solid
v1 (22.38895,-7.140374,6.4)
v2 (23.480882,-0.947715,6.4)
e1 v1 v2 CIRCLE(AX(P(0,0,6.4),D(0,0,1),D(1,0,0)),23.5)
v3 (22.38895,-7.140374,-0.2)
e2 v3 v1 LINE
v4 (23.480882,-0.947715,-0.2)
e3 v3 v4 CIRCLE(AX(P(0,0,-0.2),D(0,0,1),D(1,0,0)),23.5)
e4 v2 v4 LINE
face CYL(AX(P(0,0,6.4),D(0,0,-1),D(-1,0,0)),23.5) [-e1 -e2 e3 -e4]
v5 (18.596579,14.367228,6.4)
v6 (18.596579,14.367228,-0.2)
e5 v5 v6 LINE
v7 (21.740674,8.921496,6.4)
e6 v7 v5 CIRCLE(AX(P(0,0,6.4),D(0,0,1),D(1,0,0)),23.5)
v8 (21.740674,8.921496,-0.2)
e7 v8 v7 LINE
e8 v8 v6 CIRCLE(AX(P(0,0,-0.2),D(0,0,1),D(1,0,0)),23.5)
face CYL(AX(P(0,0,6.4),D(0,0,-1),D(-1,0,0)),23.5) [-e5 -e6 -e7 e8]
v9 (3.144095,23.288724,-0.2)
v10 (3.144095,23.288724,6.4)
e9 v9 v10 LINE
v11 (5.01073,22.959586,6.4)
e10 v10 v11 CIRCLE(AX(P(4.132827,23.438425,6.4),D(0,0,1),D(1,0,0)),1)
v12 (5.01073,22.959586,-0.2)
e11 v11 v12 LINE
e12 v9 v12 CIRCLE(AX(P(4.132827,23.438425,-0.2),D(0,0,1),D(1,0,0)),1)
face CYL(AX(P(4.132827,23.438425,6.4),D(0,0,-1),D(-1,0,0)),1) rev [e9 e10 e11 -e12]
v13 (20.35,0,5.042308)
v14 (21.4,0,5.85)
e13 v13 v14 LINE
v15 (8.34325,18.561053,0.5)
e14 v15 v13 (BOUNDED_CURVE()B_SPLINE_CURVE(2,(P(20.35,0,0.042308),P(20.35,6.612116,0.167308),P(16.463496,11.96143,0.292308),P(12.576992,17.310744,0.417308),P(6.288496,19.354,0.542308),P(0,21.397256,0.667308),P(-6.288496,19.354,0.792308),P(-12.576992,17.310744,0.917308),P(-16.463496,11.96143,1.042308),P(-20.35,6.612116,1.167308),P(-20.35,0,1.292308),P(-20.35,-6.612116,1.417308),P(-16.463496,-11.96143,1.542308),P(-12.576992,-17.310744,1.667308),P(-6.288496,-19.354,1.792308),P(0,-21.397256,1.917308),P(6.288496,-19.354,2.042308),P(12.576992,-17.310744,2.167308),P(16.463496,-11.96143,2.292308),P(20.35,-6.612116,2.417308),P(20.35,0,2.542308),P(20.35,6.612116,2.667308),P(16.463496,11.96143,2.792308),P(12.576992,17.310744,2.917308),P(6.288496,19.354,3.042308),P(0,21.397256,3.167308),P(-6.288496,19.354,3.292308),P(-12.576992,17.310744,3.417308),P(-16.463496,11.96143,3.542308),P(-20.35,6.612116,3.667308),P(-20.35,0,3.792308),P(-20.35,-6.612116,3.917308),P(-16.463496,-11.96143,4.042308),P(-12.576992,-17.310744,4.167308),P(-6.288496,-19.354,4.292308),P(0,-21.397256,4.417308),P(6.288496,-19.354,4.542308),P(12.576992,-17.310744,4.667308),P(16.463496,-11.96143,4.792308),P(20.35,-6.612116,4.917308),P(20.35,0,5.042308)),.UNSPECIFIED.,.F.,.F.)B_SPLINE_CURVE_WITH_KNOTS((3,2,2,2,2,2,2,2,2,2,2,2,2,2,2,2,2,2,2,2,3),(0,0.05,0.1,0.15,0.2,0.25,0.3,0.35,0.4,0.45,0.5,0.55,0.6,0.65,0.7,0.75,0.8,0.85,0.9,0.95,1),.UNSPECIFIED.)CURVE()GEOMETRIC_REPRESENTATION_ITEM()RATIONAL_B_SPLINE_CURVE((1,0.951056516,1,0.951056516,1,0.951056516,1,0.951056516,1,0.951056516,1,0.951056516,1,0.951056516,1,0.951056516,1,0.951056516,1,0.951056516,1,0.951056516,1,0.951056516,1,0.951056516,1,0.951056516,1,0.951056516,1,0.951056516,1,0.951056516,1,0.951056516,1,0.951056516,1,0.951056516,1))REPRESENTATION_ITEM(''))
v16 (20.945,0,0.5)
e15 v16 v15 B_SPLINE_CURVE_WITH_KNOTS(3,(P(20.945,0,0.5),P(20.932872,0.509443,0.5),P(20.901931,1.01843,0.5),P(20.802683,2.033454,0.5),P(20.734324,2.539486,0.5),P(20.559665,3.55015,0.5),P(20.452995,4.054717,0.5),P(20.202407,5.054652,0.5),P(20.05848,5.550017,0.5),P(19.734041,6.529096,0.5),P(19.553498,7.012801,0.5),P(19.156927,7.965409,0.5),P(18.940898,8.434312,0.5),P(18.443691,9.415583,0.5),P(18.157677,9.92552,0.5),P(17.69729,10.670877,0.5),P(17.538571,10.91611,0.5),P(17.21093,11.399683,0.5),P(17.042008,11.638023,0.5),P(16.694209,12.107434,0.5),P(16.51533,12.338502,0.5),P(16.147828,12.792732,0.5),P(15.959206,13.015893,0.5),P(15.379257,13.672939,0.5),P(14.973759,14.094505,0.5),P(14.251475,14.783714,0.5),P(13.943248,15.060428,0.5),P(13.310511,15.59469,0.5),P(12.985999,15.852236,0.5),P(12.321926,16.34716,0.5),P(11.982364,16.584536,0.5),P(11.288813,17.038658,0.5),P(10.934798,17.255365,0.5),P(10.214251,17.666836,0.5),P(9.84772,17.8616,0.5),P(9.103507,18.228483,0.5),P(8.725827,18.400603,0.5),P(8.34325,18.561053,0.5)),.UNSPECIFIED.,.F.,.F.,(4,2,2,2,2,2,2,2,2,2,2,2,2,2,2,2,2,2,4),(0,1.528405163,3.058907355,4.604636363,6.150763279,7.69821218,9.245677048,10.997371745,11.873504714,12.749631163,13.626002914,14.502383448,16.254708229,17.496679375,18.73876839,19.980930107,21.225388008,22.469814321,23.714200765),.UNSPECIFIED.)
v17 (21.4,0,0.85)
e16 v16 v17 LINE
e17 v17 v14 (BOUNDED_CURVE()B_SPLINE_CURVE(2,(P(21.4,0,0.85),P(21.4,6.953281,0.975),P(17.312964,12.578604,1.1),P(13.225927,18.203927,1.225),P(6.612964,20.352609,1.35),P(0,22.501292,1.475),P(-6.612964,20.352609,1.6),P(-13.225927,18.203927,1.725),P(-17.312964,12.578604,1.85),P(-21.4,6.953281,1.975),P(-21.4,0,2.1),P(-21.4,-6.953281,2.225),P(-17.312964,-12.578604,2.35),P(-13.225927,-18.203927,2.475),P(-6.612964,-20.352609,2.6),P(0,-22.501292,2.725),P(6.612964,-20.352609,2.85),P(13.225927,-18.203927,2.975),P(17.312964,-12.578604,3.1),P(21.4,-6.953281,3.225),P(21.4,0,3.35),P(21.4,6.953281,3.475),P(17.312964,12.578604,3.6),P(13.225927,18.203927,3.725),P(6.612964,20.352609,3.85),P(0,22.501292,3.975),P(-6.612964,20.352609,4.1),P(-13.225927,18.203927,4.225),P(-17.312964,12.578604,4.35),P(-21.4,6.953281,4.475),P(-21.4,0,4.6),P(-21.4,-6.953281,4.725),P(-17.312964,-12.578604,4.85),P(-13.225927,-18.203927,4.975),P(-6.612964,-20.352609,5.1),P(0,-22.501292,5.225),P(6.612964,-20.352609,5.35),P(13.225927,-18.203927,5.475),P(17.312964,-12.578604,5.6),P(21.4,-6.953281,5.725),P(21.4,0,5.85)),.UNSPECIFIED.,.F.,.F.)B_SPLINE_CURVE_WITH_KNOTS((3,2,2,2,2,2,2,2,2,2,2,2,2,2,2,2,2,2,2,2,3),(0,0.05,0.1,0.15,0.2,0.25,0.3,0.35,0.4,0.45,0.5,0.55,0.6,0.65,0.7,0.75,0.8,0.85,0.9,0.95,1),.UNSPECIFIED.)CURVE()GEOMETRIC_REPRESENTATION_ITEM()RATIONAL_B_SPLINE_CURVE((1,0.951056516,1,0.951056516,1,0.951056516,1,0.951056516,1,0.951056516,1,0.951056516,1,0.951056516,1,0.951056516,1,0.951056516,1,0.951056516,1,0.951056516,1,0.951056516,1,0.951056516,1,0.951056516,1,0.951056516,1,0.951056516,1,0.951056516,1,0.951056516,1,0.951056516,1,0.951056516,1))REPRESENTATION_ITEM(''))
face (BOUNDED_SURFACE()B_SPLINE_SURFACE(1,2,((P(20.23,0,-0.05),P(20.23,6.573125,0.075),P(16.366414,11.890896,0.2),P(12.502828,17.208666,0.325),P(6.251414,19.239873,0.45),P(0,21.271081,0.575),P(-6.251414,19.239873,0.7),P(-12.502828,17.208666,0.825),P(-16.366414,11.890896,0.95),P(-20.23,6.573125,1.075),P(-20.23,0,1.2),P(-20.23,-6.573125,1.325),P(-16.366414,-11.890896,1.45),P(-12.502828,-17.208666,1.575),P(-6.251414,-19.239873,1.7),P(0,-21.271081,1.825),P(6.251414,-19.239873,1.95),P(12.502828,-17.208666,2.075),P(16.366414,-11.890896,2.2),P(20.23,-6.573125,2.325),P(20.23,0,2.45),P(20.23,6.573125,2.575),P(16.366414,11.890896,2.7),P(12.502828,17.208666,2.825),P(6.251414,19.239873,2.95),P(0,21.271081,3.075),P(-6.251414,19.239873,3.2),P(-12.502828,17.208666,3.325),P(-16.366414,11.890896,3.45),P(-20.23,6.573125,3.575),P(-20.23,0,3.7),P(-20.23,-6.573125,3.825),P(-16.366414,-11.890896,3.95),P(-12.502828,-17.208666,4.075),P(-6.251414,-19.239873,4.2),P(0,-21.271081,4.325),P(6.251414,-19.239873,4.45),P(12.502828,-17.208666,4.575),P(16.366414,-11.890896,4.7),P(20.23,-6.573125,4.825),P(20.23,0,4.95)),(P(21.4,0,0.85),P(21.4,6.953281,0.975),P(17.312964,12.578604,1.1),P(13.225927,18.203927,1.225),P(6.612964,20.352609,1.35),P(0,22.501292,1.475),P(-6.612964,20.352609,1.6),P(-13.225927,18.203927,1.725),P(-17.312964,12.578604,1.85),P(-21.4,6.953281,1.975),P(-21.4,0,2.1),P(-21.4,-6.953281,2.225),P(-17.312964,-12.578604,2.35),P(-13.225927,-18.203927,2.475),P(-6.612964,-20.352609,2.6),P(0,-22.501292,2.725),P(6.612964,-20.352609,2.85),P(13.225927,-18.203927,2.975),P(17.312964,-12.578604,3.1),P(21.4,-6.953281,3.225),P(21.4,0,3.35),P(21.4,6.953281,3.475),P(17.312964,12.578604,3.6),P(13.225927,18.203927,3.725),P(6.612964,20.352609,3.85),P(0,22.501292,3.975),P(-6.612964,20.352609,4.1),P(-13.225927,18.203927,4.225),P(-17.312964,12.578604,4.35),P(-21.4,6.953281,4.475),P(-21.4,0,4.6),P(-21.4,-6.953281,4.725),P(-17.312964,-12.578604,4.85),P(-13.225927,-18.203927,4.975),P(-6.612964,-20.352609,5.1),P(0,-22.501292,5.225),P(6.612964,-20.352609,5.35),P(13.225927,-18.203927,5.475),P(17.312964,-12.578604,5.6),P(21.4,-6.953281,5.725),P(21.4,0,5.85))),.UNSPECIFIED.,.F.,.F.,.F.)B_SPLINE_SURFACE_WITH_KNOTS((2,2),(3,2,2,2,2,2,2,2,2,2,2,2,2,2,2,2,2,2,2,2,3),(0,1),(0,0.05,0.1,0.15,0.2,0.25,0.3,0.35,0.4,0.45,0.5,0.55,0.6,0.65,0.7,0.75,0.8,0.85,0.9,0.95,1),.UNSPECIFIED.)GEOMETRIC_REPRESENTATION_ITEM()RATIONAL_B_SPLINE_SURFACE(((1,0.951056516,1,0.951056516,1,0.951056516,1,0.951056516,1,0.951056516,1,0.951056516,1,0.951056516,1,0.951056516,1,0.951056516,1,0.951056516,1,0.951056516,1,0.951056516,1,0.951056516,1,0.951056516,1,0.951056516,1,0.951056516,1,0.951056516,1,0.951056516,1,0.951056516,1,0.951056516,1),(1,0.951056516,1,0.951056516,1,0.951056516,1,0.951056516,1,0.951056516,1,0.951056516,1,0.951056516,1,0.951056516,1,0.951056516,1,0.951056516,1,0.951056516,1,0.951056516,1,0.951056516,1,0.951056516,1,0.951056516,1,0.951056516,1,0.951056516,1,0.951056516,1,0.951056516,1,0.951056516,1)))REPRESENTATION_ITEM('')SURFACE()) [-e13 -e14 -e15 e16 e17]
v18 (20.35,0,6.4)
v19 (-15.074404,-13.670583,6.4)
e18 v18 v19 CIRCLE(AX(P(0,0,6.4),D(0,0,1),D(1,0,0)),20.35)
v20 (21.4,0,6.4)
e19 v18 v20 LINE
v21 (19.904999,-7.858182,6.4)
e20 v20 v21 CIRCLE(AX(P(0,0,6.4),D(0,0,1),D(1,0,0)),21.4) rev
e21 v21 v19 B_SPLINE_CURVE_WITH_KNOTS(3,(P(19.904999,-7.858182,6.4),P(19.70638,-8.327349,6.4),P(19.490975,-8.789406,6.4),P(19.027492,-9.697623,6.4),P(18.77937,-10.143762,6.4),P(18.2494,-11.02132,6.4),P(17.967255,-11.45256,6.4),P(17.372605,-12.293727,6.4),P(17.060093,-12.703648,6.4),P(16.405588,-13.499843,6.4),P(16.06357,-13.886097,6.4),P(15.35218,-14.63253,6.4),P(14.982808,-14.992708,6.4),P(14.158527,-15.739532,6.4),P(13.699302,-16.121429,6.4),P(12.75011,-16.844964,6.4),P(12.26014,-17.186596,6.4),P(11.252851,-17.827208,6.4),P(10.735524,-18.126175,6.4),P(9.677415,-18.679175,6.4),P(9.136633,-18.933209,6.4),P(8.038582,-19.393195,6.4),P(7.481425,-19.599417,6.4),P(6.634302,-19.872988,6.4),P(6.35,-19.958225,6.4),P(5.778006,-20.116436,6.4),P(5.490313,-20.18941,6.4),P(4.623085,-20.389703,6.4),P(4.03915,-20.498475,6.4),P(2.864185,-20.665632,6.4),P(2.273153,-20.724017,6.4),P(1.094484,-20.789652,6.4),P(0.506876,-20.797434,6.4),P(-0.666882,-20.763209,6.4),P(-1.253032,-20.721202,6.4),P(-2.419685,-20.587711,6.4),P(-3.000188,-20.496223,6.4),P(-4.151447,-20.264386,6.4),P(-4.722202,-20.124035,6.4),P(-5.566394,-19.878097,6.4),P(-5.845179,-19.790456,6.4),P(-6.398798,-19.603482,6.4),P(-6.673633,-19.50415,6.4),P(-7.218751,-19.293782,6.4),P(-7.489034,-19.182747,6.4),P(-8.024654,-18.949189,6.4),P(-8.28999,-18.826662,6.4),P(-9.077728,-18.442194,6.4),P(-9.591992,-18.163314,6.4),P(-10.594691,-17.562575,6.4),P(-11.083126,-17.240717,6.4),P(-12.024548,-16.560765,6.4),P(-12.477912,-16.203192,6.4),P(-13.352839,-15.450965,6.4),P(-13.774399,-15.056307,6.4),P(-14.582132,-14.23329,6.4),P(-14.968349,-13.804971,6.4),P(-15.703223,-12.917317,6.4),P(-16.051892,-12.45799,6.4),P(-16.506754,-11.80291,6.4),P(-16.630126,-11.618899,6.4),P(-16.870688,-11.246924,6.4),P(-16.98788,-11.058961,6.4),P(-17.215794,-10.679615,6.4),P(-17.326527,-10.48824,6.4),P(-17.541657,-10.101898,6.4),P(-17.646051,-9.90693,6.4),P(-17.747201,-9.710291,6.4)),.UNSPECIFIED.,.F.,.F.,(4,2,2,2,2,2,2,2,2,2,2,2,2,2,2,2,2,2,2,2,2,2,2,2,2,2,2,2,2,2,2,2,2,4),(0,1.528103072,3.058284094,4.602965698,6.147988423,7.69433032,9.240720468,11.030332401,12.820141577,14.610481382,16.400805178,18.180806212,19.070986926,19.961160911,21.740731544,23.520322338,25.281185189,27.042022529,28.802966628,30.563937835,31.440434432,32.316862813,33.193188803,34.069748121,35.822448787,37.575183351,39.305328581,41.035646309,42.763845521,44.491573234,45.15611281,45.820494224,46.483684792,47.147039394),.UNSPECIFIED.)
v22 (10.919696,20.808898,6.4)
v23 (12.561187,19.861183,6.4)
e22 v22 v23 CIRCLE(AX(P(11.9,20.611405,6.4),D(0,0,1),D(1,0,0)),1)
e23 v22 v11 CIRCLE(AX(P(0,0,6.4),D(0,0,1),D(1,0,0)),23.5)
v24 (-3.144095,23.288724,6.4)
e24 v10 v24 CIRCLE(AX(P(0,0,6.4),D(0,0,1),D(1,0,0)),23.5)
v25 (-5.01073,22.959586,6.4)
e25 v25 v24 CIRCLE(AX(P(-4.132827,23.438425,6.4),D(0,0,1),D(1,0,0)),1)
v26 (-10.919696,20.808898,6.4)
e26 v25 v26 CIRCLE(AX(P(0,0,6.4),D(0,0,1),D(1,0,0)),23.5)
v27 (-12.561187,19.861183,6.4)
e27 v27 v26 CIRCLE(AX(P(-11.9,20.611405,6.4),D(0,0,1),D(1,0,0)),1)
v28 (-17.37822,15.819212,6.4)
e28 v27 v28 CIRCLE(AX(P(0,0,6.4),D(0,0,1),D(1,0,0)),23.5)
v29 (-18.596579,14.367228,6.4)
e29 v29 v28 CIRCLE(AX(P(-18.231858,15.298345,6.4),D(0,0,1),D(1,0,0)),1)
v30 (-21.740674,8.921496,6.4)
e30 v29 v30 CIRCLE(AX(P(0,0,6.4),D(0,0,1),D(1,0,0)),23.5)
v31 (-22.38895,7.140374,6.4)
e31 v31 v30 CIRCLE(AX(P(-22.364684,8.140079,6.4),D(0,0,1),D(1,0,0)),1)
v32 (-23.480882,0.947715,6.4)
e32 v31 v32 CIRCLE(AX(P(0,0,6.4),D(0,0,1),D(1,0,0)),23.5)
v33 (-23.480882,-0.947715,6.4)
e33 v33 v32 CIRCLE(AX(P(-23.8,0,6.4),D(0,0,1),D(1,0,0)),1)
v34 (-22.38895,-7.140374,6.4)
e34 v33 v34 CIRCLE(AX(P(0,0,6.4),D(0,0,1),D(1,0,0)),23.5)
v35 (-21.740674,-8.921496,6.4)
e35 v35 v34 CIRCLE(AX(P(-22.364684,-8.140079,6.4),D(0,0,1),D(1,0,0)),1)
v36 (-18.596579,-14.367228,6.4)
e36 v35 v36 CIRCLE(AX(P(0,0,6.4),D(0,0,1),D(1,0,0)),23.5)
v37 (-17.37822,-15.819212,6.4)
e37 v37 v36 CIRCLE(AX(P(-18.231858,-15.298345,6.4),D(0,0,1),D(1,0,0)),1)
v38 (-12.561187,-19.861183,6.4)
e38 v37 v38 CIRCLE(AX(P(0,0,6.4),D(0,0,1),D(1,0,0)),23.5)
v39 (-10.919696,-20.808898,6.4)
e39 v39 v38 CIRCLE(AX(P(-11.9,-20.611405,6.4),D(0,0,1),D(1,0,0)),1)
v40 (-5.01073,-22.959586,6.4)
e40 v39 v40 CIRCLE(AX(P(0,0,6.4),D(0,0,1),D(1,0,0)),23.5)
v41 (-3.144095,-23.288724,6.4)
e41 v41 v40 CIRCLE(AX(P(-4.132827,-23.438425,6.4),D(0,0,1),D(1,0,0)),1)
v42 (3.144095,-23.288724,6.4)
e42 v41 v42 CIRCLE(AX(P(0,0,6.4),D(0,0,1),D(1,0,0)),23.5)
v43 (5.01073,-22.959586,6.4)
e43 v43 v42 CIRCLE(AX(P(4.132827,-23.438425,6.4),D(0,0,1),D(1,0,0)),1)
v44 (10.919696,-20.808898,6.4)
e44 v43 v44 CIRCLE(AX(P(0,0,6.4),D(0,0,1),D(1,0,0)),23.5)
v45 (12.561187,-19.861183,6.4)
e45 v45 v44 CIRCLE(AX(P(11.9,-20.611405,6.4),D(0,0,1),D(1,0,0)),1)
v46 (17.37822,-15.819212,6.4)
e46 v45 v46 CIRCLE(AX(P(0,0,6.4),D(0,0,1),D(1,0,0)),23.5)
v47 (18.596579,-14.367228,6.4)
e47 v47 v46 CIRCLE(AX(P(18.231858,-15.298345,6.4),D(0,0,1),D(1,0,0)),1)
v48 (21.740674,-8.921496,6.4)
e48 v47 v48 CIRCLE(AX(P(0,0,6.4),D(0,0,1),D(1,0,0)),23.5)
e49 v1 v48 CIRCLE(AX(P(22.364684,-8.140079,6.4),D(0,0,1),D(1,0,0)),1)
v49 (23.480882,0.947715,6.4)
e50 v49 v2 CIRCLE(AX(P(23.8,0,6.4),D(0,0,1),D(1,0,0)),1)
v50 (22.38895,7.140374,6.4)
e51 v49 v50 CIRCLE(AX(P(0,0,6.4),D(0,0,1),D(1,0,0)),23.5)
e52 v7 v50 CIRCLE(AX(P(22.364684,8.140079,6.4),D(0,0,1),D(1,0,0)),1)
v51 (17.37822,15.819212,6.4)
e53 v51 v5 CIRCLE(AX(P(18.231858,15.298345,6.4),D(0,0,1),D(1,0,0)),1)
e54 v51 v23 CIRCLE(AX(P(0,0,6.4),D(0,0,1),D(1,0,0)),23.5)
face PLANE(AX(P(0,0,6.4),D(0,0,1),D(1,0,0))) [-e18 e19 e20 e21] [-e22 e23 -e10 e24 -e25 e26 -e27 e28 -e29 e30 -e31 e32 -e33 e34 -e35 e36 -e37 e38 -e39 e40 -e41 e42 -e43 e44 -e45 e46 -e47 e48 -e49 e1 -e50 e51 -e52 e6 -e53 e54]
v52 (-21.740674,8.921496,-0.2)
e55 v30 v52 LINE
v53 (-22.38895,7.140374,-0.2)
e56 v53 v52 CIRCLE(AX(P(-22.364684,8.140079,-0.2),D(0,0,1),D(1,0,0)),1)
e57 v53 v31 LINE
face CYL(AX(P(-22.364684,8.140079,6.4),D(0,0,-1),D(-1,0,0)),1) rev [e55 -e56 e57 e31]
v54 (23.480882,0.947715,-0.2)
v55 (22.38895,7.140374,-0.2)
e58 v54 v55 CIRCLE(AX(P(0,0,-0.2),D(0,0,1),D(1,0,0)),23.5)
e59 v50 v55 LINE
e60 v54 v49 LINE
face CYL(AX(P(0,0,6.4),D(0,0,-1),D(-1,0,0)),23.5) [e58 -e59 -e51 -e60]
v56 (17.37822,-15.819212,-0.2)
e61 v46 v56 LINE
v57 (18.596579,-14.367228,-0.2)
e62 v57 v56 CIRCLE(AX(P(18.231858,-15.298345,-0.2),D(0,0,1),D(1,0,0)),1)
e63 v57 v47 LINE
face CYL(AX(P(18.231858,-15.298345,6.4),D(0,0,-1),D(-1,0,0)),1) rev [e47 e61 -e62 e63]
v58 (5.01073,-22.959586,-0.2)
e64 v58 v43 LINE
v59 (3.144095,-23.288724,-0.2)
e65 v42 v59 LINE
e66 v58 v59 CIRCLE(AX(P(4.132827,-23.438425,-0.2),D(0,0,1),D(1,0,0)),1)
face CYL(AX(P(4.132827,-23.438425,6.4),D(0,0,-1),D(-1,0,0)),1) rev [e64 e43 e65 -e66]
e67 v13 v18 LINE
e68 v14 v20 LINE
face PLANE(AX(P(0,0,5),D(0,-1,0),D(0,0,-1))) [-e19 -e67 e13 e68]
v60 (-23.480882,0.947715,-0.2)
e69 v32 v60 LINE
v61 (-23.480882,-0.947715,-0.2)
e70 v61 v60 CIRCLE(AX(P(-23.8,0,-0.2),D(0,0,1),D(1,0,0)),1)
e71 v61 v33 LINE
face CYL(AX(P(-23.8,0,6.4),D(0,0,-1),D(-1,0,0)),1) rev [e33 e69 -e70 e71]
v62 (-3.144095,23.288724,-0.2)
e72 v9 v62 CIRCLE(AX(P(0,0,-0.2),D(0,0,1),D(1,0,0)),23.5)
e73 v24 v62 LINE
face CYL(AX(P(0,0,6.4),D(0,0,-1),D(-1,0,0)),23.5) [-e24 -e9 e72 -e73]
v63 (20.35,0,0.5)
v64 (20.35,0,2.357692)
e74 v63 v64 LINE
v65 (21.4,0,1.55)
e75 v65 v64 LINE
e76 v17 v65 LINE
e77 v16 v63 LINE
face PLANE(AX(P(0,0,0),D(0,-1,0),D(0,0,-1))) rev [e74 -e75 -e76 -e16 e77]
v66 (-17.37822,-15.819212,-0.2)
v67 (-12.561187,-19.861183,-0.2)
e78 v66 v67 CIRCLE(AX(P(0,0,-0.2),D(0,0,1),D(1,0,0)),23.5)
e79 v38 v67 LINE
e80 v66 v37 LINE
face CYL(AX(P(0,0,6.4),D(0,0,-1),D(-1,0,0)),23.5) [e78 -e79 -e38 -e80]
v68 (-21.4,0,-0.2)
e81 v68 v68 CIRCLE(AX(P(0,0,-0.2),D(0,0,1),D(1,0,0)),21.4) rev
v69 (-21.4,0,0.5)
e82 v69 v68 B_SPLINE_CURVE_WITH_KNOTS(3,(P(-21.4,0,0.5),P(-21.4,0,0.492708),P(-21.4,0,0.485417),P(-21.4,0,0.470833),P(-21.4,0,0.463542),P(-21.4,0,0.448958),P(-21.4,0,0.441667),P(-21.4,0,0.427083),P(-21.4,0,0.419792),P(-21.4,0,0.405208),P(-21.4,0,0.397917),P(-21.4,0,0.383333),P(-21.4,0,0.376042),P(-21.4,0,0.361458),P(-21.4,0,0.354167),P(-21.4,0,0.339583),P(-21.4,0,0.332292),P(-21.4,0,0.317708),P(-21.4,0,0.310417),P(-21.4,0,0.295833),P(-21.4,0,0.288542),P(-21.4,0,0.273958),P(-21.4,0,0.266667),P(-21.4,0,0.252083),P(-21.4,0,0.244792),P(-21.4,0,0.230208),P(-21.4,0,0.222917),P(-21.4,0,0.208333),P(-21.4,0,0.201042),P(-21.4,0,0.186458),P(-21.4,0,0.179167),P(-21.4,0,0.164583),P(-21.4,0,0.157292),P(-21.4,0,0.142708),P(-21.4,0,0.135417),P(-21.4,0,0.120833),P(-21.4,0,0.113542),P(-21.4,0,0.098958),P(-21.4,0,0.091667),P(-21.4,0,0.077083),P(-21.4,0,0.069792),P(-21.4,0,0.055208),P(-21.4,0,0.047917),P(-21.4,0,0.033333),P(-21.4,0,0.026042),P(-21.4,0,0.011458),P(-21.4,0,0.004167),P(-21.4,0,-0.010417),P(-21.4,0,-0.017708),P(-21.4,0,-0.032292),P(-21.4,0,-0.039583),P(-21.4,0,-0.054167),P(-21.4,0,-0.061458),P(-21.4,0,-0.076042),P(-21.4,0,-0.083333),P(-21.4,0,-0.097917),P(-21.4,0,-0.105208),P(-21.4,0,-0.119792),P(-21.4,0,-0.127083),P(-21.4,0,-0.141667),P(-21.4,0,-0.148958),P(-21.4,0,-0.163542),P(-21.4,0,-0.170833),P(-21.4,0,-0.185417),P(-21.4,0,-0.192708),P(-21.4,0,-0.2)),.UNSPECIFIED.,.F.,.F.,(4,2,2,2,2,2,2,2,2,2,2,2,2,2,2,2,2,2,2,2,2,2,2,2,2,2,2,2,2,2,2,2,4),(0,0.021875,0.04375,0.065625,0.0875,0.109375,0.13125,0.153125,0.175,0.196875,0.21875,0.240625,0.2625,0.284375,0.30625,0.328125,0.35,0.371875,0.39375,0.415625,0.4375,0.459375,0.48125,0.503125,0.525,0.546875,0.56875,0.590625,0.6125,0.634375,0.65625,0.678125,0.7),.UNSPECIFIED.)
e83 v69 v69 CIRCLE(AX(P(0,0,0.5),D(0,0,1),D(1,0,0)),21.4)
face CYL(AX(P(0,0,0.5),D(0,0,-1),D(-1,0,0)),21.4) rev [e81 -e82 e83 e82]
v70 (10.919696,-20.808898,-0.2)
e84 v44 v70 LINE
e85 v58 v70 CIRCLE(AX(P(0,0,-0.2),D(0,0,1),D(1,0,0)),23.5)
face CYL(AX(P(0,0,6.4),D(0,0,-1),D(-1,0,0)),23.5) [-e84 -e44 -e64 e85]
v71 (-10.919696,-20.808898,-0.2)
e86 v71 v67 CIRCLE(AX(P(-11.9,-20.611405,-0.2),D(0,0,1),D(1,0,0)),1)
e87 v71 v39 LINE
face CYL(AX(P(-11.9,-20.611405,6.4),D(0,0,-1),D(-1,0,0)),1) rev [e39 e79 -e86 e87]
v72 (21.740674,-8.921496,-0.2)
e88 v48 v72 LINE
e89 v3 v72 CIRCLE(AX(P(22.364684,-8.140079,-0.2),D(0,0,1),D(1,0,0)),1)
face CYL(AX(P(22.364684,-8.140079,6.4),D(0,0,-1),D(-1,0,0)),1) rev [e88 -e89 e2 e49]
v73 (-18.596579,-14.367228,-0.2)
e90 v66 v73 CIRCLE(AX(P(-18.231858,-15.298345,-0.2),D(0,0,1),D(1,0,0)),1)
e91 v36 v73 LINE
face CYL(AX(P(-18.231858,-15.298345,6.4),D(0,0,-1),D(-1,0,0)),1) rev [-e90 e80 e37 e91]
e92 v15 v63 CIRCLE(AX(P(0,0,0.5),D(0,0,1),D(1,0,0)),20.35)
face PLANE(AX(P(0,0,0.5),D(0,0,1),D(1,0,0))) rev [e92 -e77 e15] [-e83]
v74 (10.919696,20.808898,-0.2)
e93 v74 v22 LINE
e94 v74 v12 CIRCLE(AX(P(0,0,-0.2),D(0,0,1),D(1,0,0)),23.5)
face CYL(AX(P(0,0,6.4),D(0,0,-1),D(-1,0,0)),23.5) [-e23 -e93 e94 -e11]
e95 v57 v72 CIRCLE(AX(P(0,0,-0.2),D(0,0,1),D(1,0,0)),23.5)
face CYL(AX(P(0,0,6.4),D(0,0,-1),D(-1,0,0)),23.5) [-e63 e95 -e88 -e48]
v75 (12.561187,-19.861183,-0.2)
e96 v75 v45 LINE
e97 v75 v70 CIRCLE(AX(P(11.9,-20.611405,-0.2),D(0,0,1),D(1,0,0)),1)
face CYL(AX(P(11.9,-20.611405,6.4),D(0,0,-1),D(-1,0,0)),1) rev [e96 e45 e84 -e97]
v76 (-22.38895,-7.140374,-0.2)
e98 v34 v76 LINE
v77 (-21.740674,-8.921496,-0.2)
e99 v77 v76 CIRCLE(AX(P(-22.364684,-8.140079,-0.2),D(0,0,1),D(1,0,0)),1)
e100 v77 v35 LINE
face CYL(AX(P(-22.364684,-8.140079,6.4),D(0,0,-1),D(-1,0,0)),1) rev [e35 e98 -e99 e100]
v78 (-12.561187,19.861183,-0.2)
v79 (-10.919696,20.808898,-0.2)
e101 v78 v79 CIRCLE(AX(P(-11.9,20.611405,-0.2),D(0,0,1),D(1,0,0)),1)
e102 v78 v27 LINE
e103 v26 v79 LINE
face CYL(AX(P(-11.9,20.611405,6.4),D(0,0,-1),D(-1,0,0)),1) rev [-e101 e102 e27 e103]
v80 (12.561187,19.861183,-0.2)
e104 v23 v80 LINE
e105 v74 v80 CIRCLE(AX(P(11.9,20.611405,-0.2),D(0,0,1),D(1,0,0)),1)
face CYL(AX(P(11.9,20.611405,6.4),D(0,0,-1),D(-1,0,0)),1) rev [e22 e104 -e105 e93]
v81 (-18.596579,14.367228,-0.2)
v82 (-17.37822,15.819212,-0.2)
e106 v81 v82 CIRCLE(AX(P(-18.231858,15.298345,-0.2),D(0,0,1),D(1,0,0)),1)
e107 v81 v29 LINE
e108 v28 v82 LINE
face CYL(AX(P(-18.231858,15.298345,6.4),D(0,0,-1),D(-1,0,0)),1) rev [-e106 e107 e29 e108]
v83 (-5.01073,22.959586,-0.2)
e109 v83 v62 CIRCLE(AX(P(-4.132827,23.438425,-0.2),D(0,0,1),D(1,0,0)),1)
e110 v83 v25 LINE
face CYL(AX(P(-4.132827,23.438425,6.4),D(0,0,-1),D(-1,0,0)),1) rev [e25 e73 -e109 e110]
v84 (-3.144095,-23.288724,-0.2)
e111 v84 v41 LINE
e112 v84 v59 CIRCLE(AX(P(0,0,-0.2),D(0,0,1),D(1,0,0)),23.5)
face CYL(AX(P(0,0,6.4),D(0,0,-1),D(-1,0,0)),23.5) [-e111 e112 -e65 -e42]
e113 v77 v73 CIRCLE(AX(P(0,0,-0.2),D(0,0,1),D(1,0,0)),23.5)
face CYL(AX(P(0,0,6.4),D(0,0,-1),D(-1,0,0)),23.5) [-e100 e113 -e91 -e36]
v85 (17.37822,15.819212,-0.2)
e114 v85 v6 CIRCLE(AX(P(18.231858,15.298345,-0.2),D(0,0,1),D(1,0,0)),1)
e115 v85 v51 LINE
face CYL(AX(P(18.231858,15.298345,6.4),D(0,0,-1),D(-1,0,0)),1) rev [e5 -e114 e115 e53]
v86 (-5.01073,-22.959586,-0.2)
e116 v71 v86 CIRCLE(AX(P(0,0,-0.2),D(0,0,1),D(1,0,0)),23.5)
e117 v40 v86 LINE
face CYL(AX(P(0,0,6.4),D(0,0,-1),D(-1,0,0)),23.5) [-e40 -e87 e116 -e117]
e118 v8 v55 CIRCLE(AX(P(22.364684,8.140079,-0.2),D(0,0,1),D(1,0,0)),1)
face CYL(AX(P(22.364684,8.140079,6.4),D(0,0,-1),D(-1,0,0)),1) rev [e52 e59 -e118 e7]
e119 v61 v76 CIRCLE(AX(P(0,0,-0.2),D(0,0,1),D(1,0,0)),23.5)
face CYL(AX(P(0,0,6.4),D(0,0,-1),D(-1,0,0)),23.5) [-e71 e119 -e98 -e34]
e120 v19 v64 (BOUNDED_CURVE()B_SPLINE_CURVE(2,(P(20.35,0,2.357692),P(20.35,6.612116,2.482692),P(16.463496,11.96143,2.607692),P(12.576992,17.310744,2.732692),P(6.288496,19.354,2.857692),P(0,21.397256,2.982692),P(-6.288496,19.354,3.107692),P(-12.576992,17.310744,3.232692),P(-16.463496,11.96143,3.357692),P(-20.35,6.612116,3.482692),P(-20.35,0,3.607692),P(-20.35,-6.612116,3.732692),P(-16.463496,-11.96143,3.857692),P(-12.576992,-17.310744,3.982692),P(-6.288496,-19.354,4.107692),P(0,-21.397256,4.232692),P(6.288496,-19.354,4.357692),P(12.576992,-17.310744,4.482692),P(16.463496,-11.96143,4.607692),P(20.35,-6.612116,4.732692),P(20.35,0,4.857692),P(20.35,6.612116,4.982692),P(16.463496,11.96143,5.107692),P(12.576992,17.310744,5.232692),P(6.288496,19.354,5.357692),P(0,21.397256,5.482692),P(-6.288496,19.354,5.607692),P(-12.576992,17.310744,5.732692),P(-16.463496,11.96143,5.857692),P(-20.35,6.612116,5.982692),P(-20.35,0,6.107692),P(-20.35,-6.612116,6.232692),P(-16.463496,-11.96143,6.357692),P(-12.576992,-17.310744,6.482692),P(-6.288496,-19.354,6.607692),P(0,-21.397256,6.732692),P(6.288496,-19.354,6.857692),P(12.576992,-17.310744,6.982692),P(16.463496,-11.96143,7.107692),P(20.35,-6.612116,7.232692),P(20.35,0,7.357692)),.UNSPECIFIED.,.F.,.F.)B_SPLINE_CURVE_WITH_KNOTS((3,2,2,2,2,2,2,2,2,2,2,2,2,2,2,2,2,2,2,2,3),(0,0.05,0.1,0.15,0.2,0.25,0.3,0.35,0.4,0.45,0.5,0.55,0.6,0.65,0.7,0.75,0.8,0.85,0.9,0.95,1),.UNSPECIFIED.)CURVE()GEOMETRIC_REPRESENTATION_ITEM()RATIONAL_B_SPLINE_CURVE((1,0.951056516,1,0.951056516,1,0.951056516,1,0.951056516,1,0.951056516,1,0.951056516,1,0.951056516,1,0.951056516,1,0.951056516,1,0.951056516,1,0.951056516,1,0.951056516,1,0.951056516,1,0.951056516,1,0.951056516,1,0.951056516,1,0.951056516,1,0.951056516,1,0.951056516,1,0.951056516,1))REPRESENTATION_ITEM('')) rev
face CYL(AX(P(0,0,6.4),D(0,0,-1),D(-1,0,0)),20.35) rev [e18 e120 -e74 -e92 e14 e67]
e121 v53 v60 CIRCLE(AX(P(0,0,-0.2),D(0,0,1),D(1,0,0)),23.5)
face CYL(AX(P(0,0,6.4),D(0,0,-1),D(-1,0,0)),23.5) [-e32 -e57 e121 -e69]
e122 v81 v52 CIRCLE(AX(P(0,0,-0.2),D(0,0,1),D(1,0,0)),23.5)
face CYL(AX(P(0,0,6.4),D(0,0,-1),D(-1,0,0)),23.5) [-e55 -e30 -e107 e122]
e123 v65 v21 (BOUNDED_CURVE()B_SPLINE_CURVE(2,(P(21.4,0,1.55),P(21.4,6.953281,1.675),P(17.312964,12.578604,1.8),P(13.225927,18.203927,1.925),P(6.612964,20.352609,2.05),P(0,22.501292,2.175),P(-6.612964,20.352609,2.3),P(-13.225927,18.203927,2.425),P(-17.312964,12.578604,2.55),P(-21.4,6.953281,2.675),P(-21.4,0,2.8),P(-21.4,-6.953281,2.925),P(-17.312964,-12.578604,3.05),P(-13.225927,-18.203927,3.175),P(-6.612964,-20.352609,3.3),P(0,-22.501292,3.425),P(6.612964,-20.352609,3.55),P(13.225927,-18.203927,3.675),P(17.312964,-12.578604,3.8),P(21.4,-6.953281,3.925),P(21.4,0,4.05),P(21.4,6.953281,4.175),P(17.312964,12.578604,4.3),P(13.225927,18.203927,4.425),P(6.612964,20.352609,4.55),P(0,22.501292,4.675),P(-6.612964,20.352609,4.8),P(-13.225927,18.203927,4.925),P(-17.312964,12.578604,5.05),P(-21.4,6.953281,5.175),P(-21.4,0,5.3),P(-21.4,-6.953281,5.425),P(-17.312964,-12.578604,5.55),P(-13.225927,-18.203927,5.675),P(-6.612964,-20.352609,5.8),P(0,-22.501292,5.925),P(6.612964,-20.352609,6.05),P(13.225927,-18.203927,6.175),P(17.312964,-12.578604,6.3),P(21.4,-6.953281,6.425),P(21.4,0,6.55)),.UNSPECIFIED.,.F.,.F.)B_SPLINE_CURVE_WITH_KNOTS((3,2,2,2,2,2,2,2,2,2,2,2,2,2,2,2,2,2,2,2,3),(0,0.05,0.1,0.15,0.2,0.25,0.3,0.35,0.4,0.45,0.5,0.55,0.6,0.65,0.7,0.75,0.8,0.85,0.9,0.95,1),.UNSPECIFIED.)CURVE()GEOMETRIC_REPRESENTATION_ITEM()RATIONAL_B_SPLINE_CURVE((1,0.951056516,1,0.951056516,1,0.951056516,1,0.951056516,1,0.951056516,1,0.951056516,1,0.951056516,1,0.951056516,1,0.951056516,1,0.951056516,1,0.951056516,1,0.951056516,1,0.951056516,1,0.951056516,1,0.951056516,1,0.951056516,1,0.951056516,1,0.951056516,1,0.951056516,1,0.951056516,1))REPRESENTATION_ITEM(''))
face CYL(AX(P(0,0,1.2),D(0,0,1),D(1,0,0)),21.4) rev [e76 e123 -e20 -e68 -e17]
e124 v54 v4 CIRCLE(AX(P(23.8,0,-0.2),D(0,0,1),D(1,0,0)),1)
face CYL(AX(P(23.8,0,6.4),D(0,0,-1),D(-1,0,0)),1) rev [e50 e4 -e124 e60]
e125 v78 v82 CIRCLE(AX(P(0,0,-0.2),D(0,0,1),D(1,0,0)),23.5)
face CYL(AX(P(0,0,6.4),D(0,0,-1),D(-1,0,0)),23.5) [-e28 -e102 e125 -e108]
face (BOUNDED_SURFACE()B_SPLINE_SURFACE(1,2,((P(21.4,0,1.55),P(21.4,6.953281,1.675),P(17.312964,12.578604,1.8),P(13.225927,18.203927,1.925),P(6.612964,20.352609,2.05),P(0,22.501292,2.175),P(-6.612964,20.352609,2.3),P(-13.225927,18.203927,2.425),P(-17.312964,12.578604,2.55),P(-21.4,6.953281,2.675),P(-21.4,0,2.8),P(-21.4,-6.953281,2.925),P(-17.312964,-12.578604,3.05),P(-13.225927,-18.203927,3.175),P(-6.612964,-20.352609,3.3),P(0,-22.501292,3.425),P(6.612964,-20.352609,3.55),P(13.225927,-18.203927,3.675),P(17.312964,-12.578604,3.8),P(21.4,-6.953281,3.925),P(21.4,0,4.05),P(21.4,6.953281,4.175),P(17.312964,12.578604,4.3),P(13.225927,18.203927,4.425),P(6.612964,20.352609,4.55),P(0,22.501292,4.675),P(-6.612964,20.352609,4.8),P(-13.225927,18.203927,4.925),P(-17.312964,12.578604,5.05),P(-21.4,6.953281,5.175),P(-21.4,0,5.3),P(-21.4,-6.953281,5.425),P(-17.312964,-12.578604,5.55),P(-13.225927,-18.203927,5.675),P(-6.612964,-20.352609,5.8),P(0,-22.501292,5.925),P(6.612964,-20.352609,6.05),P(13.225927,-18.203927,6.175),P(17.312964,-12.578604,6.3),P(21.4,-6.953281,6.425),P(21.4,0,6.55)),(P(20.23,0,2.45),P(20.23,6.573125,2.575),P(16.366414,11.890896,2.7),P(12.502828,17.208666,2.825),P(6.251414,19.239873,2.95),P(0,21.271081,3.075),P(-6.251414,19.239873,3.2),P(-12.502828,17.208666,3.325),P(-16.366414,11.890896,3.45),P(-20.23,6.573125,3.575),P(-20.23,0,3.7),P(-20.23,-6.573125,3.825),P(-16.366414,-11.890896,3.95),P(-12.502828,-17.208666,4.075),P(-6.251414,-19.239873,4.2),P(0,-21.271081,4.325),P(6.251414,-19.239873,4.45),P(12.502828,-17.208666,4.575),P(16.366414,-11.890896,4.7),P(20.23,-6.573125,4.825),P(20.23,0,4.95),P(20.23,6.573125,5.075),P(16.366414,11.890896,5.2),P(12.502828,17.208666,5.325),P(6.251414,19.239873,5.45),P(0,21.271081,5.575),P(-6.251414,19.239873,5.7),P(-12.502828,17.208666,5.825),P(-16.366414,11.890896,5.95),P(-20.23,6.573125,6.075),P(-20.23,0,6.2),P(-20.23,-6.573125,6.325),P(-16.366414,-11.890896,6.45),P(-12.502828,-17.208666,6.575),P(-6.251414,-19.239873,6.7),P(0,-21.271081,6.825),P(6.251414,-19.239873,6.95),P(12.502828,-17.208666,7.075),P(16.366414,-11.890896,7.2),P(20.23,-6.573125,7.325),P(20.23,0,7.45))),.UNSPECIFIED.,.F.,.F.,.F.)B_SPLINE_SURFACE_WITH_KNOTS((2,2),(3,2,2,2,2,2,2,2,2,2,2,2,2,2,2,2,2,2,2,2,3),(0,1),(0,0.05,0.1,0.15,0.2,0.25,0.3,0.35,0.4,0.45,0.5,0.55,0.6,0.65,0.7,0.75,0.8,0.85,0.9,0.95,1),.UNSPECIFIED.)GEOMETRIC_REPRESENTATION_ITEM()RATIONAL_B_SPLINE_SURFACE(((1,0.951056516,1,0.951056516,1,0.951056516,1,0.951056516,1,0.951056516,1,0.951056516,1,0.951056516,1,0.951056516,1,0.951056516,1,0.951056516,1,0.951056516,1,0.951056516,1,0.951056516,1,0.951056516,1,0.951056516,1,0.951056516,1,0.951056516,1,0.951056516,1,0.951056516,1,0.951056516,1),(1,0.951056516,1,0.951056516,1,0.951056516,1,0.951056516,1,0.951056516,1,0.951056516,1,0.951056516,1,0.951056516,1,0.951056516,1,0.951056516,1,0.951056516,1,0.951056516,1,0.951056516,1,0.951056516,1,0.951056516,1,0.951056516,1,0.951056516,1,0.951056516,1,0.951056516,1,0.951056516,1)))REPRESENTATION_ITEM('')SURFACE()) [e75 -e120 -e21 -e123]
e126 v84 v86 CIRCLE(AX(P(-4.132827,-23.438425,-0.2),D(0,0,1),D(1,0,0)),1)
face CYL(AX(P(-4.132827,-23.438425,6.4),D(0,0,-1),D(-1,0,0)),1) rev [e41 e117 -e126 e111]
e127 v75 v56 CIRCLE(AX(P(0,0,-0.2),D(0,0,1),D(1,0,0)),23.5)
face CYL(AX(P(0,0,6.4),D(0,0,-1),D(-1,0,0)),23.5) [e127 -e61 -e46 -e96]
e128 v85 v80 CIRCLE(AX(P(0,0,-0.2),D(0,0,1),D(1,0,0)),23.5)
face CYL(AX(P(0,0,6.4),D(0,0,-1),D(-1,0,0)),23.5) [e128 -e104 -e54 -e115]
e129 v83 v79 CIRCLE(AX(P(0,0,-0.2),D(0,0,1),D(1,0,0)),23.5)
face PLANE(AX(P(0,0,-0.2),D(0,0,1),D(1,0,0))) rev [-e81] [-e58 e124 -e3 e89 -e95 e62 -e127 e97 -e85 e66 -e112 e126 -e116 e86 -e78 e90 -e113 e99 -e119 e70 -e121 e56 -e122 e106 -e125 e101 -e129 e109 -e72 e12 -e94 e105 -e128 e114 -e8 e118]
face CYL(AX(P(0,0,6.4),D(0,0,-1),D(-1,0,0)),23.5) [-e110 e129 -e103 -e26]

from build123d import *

# Parameters (mm, degrees)
GRIP_RING_D47_START                  = -0.2
SKETCH1_R                            = 23.5
SKETCH1_R_2                          = 20.35
GRIP_RING_D47_DEPTH                  = 6.6
LOWER_FEMALE_D42_P2P5_PITCH          = 2.5
GRIP_FLUTES_START                    = -0.2
SKETCH3_R                            = 1
GRIP_FLUTES_DEPTH                    = 6.6
HAND_START_THREAD_ENTRY_RELIEF_START = -0.21
SKETCH4_R                            = 21.4
HAND_START_THREAD_ENTRY_RELIEF_DEPTH = 0.71


with BuildPart() as part:
    # Sketch1 → Grip_ring_D47 (new body)
    with BuildSketch(Plane.XY.offset(GRIP_RING_D47_START)):
        Circle(SKETCH1_R)
        Circle(SKETCH1_R_2, mode=Mode.SUBTRACT)
    extrude(amount=GRIP_RING_D47_DEPTH)

    # Lower_female_D42_P2p5: the profile of 3DSketch1 screwed along a right-hand helix of 2 turns, 10 arcs to a turn; built about Z, then put on its axis
    lower_female_d42_p2p5_z = Axis((0, 0, 0), (0, 0, 1))
    lower_female_d42_p2p5_corners = [(20.1, 0, -1.35), (21.4, 0, -0.35), (21.4, 0, 0.35), (20.1, 0, 1.35)]
    with BuildLine(mode=Mode.PRIVATE) as lower_female_d42_p2p5_profile:
        Line(lower_female_d42_p2p5_corners[0], lower_female_d42_p2p5_corners[1])
        Line(lower_female_d42_p2p5_corners[1], lower_female_d42_p2p5_corners[2])
        Line(lower_female_d42_p2p5_corners[2], lower_female_d42_p2p5_corners[3])
        Line(lower_female_d42_p2p5_corners[3], lower_female_d42_p2p5_corners[0])
    lower_female_d42_p2p5_cap = Face(lower_female_d42_p2p5_profile.wire())
    lower_female_d42_p2p5_turn_angles = [0, 18, 36, 54, 72, 90, 108, 126, 144, 162, 180, 198, 216, 234, 252, 270, 288, 306, 324, 342, 360]
    lower_female_d42_p2p5_turn_weights = [1, 0.9510565162951535, 1, 0.9510565162951535, 1, 0.9510565162951535, 1, 0.9510565162951535, 1, 0.9510565162951535, 1, 0.9510565162951535, 1, 0.9510565162951535, 1, 0.9510565162951535, 1, 0.9510565162951535, 1, 0.9510565162951535, 1]
    lower_female_d42_p2p5_turn_rails = [Edge.make_bspline([Vector(p[0], p[1], 0).rotate(lower_female_d42_p2p5_z, lower_female_d42_p2p5_turn_angles[k]) / lower_female_d42_p2p5_turn_weights[k] + Vector(0, 0, p[2] + LOWER_FEMALE_D42_P2P5_PITCH * lower_female_d42_p2p5_turn_angles[k] / 360) for k in range(21)], [0, 0, 0, 1, 1, 2, 2, 3, 3, 4, 4, 5, 5, 6, 6, 7, 7, 8, 8, 9, 9, 10, 10, 10], 2, lower_female_d42_p2p5_turn_weights) for p in lower_female_d42_p2p5_corners]
    lower_female_d42_p2p5_turn_sides = [Face.make_surface_from_curves(lower_female_d42_p2p5_turn_rails[p[0]], lower_female_d42_p2p5_turn_rails[p[1]]) for p in [(0, 1), (1, 2), (2, 3), (3, 0)]]
    lower_female_d42_p2p5 = Plane(origin=(0, 0, 1.2), x_dir=(1, 0, 0), z_dir=(0, 0, 1)) * Solid(Shell([*[p.moved(Location((0, 0, LOWER_FEMALE_D42_P2P5_PITCH * i))) for i in range(2) for p in lower_female_d42_p2p5_turn_sides], lower_female_d42_p2p5_cap, lower_female_d42_p2p5_cap.rotate(lower_female_d42_p2p5_z, 720).moved(Location((0, 0, LOWER_FEMALE_D42_P2P5_PITCH * 720 / 360)))]))
    add(lower_female_d42_p2p5, mode=Mode.SUBTRACT)

    # Sketch3 → Grip_flutes (cut)
    with BuildSketch(Plane.XY.offset(GRIP_FLUTES_START)):
        with Locations((23.8, 0)):
            Circle(SKETCH3_R)
        with Locations((22.364684375, 8.140079411)):
            Circle(SKETCH3_R)
        with Locations((18.231857746, 15.298345111)):
            Circle(SKETCH3_R)
        with Locations((11.9, 20.61140461)):
            Circle(SKETCH3_R)
        with Locations((4.132826628, 23.438424522)):
            Circle(SKETCH3_R)
        with Locations((-4.132826628, 23.438424522)):
            Circle(SKETCH3_R)
        with Locations((-11.9, 20.61140461)):
            Circle(SKETCH3_R)
        with Locations((-18.231857746, 15.298345111)):
            Circle(SKETCH3_R)
        with Locations((-22.364684375, 8.140079411)):
            Circle(SKETCH3_R)
        with Locations((-23.8, 0)):
            Circle(SKETCH3_R)
        with Locations((-22.364684375, -8.140079411)):
            Circle(SKETCH3_R)
        with Locations((-18.231857746, -15.298345111)):
            Circle(SKETCH3_R)
        with Locations((-11.9, -20.61140461)):
            Circle(SKETCH3_R)
        with Locations((-4.132826628, -23.438424522)):
            Circle(SKETCH3_R)
        with Locations((4.132826628, -23.438424522)):
            Circle(SKETCH3_R)
        with Locations((11.9, -20.61140461)):
            Circle(SKETCH3_R)
        with Locations((18.231857746, -15.298345111)):
            Circle(SKETCH3_R)
        with Locations((22.364684375, -8.140079411)):
            Circle(SKETCH3_R)
    extrude(amount=GRIP_FLUTES_DEPTH, mode=Mode.SUBTRACT)

    # Sketch4 → Hand_start_thread_entry_relief (cut)
    with BuildSketch(Plane.XY.offset(HAND_START_THREAD_ENTRY_RELIEF_START)):
        with Locations(Location((0, 0, 0), (0, 0, 180))):
            Circle(SKETCH4_R)
    extrude(amount=HAND_START_THREAD_ENTRY_RELIEF_DEPTH, mode=Mode.SUBTRACT)


solid = part.part
